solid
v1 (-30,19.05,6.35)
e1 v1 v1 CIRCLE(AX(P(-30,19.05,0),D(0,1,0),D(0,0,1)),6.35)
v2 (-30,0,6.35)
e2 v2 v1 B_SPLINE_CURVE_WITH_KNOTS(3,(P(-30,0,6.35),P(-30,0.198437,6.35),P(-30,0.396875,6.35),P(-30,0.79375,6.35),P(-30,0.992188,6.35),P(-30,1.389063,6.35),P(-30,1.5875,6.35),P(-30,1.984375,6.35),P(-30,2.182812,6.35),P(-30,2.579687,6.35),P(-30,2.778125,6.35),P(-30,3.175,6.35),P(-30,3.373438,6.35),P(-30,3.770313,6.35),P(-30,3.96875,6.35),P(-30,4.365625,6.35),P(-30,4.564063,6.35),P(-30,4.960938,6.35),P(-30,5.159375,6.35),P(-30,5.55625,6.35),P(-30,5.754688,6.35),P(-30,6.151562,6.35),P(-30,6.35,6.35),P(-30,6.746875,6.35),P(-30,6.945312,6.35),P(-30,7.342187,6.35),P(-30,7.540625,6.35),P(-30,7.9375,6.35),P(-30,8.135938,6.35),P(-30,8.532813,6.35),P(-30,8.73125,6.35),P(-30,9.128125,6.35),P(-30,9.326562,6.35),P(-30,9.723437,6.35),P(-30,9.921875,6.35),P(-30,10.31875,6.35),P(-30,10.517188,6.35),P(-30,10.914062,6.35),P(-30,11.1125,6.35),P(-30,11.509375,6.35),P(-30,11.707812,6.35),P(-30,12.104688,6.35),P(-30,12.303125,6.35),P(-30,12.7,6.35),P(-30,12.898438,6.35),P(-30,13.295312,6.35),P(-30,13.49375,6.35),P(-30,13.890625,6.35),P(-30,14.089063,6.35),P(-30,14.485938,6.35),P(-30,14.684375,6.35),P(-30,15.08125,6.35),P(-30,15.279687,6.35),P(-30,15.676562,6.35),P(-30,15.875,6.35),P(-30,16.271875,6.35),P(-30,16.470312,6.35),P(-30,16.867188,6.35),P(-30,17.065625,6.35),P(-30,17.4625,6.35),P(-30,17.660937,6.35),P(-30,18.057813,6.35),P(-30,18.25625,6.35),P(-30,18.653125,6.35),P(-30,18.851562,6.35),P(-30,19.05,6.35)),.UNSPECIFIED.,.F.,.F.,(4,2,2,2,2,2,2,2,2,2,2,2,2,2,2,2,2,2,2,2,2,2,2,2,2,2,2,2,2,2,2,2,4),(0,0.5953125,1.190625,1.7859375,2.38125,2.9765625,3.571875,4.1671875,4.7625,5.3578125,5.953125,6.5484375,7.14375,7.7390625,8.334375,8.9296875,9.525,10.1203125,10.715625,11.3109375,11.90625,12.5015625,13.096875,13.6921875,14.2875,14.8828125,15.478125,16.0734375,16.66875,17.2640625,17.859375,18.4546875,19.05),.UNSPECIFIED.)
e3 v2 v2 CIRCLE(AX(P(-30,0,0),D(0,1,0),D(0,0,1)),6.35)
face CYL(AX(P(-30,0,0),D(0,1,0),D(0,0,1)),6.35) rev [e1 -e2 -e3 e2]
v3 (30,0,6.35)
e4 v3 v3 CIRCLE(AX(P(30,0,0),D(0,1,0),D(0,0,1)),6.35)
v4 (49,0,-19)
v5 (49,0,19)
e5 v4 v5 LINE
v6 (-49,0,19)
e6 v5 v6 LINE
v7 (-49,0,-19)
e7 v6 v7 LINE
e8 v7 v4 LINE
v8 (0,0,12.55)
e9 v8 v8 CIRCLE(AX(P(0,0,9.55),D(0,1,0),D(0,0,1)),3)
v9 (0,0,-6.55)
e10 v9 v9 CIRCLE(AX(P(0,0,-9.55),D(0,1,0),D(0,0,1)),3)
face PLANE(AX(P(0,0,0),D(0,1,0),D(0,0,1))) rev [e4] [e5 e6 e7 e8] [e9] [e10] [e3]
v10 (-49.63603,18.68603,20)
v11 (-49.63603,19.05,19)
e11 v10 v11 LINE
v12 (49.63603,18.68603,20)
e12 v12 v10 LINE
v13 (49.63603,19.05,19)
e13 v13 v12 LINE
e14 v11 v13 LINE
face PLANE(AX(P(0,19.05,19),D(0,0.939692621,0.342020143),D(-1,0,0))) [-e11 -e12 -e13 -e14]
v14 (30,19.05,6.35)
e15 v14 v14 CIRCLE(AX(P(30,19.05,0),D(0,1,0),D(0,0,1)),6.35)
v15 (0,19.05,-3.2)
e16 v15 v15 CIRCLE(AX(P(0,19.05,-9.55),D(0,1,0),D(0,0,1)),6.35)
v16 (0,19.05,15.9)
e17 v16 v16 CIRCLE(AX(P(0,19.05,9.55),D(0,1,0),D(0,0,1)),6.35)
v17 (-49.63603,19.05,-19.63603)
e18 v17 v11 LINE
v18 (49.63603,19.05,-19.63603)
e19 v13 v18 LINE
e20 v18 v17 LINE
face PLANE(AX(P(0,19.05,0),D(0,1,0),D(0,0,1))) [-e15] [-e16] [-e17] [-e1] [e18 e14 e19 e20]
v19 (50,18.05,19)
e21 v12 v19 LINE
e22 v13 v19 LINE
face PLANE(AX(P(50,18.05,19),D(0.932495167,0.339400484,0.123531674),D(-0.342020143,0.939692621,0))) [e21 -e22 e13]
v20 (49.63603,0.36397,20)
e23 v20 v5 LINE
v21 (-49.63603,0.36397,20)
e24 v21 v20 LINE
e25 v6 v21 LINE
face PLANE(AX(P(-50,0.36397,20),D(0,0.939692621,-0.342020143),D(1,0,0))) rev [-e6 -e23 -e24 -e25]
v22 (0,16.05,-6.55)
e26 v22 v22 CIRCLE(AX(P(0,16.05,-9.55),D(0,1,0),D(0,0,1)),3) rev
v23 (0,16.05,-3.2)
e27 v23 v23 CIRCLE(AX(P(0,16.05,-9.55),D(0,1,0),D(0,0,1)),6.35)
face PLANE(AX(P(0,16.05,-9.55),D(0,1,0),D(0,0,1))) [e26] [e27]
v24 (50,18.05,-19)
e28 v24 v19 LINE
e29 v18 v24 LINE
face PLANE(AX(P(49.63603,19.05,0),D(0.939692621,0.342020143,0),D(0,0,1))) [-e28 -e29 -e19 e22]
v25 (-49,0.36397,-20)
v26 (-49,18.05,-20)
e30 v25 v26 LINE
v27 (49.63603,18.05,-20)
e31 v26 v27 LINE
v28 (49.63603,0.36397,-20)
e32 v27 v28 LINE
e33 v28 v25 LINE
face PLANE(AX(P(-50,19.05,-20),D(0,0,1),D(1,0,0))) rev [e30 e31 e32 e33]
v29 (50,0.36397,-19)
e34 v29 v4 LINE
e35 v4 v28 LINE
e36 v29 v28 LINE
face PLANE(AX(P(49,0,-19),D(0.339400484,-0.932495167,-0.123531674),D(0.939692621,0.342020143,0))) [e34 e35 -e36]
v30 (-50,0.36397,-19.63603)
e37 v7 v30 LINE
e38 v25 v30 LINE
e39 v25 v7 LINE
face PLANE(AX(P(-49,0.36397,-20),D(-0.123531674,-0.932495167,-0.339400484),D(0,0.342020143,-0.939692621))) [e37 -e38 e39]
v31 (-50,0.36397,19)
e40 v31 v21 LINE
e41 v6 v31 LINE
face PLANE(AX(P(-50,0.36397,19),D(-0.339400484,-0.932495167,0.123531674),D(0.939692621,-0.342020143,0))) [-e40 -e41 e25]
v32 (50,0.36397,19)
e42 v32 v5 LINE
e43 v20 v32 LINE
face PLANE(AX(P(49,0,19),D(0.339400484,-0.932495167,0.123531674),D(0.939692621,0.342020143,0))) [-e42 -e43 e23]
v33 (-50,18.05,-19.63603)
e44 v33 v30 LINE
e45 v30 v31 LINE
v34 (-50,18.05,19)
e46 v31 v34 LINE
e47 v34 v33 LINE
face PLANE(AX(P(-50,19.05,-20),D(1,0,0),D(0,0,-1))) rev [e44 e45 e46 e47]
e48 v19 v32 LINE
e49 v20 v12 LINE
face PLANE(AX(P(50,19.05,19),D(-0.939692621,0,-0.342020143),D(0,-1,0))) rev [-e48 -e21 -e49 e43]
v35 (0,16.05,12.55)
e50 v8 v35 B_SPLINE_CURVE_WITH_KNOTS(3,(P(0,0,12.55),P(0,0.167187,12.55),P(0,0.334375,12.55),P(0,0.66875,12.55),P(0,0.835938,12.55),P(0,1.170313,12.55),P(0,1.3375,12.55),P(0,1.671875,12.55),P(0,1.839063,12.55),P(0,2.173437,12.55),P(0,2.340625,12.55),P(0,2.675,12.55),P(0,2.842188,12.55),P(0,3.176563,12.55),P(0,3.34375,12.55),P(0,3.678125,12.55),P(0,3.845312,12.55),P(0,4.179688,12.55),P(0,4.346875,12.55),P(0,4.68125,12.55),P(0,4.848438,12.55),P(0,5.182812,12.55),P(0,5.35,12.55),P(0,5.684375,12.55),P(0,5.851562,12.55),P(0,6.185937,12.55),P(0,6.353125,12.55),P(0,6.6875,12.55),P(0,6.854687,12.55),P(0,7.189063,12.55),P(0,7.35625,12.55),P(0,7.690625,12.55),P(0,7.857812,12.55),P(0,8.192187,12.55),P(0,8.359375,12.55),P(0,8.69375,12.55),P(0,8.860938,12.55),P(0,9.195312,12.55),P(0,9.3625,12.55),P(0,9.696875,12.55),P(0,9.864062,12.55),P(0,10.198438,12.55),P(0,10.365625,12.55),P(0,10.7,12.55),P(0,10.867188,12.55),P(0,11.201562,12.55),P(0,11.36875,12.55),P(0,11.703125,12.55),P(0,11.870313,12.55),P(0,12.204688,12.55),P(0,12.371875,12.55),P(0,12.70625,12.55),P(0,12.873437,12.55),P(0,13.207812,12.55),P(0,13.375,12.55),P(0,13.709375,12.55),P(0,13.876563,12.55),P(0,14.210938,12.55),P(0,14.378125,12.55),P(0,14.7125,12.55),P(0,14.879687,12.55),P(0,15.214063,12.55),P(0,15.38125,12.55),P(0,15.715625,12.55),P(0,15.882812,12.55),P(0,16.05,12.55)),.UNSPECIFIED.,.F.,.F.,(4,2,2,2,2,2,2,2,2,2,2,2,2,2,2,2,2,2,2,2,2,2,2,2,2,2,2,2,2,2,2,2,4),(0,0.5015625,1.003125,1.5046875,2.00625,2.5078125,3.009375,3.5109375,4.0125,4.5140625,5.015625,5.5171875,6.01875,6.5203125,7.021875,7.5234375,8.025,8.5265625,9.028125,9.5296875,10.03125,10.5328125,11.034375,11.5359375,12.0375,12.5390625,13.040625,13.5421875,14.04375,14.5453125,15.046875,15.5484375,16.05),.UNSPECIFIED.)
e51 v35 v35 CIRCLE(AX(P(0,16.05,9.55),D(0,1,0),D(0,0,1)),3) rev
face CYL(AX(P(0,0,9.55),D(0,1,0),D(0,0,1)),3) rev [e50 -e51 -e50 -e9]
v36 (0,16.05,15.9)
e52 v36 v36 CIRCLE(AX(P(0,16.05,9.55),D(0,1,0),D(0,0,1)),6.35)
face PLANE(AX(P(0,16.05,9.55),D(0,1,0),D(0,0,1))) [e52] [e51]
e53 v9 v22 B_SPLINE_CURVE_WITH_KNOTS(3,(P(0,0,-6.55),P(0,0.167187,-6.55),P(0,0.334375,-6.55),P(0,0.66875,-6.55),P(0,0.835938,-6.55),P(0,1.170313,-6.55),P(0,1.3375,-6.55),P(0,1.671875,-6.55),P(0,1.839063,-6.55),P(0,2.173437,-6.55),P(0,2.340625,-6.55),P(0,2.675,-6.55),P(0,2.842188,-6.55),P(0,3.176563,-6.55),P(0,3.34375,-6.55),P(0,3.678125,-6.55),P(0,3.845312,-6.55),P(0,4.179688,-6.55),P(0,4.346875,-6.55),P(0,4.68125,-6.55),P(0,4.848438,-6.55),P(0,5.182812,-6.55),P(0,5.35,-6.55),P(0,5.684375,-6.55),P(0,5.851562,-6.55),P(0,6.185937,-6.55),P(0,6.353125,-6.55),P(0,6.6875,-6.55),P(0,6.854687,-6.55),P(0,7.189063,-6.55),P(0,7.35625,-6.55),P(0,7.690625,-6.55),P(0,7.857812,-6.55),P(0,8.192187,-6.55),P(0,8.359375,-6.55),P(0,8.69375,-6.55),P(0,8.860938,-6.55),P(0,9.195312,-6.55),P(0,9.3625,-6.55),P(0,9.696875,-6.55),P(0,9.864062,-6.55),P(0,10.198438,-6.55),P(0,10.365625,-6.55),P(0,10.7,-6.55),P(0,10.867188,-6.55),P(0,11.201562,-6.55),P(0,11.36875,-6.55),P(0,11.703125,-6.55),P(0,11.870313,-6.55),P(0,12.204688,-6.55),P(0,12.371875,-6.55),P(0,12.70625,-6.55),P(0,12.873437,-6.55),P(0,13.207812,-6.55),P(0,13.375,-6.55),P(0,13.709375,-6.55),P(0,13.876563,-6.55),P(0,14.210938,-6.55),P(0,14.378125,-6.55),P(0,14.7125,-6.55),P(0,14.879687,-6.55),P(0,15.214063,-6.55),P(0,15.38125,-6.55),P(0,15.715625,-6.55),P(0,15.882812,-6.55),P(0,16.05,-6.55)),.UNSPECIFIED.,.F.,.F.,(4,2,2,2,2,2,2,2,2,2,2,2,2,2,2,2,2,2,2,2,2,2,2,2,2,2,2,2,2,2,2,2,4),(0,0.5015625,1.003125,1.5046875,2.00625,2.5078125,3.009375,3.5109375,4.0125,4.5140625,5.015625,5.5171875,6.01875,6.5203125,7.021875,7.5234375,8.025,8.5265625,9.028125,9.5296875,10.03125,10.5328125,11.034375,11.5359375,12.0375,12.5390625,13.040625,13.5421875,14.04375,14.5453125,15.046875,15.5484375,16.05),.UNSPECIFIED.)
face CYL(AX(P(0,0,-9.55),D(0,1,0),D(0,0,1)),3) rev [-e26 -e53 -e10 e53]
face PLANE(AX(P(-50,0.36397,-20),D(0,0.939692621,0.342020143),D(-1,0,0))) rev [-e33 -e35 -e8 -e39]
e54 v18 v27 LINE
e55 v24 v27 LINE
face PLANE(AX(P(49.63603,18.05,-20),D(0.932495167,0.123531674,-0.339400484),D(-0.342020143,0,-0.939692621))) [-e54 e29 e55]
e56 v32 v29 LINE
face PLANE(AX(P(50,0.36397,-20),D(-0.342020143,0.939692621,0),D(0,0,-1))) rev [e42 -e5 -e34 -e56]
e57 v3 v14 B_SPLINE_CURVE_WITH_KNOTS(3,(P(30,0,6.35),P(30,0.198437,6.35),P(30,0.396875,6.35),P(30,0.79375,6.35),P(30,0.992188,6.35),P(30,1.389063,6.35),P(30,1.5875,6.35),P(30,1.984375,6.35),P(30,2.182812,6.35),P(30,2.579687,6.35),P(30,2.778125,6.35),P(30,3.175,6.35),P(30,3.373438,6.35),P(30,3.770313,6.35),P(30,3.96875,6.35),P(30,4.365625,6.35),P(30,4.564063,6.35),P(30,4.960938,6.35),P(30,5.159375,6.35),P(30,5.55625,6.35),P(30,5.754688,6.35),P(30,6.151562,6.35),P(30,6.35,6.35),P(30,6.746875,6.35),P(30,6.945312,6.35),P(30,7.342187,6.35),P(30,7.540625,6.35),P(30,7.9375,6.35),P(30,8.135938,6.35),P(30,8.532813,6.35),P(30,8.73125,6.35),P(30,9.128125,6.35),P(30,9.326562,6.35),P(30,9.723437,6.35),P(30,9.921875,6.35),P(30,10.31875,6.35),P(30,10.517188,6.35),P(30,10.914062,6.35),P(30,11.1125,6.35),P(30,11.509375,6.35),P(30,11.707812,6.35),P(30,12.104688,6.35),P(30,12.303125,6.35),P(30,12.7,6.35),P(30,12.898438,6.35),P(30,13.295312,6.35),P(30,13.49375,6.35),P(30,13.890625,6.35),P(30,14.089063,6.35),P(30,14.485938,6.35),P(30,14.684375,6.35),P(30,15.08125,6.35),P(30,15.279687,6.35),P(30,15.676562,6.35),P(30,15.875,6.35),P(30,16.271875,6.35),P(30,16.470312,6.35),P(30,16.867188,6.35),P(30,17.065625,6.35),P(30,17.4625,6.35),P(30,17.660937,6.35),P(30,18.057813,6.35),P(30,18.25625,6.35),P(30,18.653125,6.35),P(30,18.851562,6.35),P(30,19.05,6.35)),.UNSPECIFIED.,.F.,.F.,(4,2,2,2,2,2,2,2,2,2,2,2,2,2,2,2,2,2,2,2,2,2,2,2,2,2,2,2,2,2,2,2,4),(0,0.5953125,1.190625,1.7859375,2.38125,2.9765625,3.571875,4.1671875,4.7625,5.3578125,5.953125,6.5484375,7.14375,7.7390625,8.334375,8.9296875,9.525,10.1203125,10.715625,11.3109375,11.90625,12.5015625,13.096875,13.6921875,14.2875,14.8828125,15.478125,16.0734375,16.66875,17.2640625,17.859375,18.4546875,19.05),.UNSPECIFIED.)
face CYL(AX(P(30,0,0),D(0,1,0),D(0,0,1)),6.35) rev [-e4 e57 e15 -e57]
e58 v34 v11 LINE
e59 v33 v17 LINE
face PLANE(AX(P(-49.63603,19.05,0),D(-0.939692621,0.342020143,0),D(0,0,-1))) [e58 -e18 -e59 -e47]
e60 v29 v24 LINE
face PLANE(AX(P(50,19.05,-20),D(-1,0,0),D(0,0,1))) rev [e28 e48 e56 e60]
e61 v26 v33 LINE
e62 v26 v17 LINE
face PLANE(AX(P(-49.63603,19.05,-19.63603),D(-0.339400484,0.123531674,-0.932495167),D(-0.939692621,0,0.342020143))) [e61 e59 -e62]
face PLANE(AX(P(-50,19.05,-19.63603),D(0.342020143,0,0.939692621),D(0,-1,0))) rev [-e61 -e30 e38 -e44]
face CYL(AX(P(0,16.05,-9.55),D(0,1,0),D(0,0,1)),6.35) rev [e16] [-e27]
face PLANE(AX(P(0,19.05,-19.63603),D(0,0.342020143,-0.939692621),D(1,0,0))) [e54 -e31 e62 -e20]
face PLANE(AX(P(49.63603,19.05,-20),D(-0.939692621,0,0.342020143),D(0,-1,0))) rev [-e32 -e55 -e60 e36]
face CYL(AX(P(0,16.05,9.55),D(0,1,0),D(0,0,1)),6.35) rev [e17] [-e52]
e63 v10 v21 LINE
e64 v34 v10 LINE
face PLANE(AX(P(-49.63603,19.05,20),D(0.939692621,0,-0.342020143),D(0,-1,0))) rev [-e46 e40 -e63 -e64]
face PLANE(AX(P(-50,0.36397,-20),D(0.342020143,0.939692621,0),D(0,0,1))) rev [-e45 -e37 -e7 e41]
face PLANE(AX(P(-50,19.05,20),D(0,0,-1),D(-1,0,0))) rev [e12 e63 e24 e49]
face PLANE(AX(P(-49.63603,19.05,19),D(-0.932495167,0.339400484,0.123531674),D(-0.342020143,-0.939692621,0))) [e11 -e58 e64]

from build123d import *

# Parameters (mm, degrees)
SKETCH3_W           = 100
SKETCH3_H           = 40
BOSS_EXTRUDE1_DEPTH = 19.05
SKETCH4_R           = 3
SKETCH4_R_2         = 6.35
CUT_EXTRUDE1_DEPTH  = 58.121821575
SKETCH5_R           = 6.35
CUT_EXTRUDE2_DEPTH  = 3


with BuildPart() as part:
    # Sketch3 → Boss-Extrude1 (new body)
    with BuildSketch(Plane(origin=(0, 0, 0), x_dir=(1, 0, 0), z_dir=(0, 1, 0))):
        Rectangle(SKETCH3_W, SKETCH3_H)
    extrude(amount=BOSS_EXTRUDE1_DEPTH)

    # Sketch4 → Cut-Extrude1 (cut, through all)
    with BuildSketch(Plane(origin=(0, 19.05, 0), x_dir=(1, 0, 0), z_dir=(0, 1, 0))):
        with Locations(Location((0, 9.55, 0), (0, 0, 270))):
            Circle(SKETCH4_R)
        with Locations(Location((0, -9.55, 0), (0, 0, 270))):
            Circle(SKETCH4_R)
        with Locations(Location((-30, 0, 0), (0, 0, 270))):
            Circle(SKETCH4_R_2)
        with Locations(Location((30, 0, 0), (0, 0, 270))):
            Circle(SKETCH4_R_2)
    extrude(amount=-CUT_EXTRUDE1_DEPTH, mode=Mode.SUBTRACT)

    # Sketch5 → Cut-Extrude2 (cut)
    with BuildSketch(Plane(origin=(0, 19.05, 0), x_dir=(1, 0, 0), z_dir=(0, 1, 0))):
        with Locations(Location((0, 9.55, 0), (0, 0, 270))):
            Circle(SKETCH5_R)
        with Locations(Location((0, -9.55, 0), (0, 0, 270))):
            Circle(SKETCH5_R)
    extrude(amount=-CUT_EXTRUDE2_DEPTH, mode=Mode.SUBTRACT)

    # Chamfer1
    # the kernel refuses this chamfer: 1, 0.363970234 mm, written as the material it takes off along each edge
    with BuildSketch(Plane(origin=(-49.757353177, 18.595343255, 19.333333333), x_dir=(0.34202014332567077, 0.9396926207859077, 0), z_dir=(-0.932495167133386, 0.3394004844336423, 0.12353167382937617))) as chamfer1_piece_1:
        Polygon((-0.595445134, 0.335906163), (0.468732639, 0.335906163), (0.126712495, -0.671812326), align=None)
    extrude(amount=0.509225374, mode=Mode.SUBTRACT)
    with BuildSketch(Plane(origin=(-49.545343255, 18.383333333, -19.757353177), x_dir=(-0.9396926207859077, 0, 0.34202014332567077), z_dir=(-0.3394004844336423, 0.12353167382937617, -0.932495167133386)), Plane(origin=(49.757353177, 18.595343255, 19.333333333), x_dir=(-0.34202014332567077, 0.9396926207859077, 0), z_dir=(0.932495167133386, 0.3394004844336423, 0.12353167382937617)), Plane(origin=(49.545343255, 0.242646823, -19.333333333), x_dir=(0.34202014332567077, 0, 0.9396926207859077), z_dir=(0.3394004844336414, -0.9324951671333863, -0.12353167382937585))) as chamfer1_piece_2:
        Polygon((-0.595445134, -0.335906163), (0.468732639, -0.335906163), (0.126712495, 0.671812326), align=None)
    extrude(amount=0.509225374, mode=Mode.SUBTRACT)
    with BuildSketch(Plane(origin=(-49.545343255, 0.242646823, 19.333333333), x_dir=(0.9396926207859081, -0.3420201433256699, 0), z_dir=(-0.3394004844336414, -0.9324951671333863, 0.12353167382937585))) as chamfer1_piece_3:
        Polygon((-0.468732639, -0.335906163), (0.595445134, -0.335906163), (-0.126712495, 0.671812326), align=None)
    extrude(amount=0.509225374, mode=Mode.SUBTRACT)
    with BuildSketch(Plane(origin=(49.757353177, 18.383333333, -19.545343255), x_dir=(0.34202014332567077, 0, 0.9396926207859077), z_dir=(0.932495167133386, 0.12353167382937617, -0.3394004844336423)), Plane(origin=(49.545343255, 0.242646823, 19.333333333), x_dir=(-0.9396926207859081, -0.3420201433256699, 0), z_dir=(0.3394004844336414, -0.9324951671333863, 0.12353167382937585)), Plane(origin=(-49.333333333, 0.242646823, -19.545343255), x_dir=(-0.9396926207859077, 0, 0.34202014332567077), z_dir=(-0.12353167382937585, -0.9324951671333863, -0.3394004844336414))) as chamfer1_piece_4:
        Polygon((-0.468732639, 0.335906163), (0.595445134, 0.335906163), (-0.126712495, -0.671812326), align=None)
    extrude(amount=0.509225374, mode=Mode.SUBTRACT)
    with BuildSketch(Plane(origin=(-50, 19.05, 22.594194733), x_dir=(-0.013184058198643421, -0.9999130865277317, 0), z_dir=(0, 0, -1)), Plane(origin=(50, 19.05, -22.594194733), x_dir=(0.013184058198643421, -0.9999130865277317, 0), z_dir=(0, 0, 1))) as chamfer1_piece_5:
        with BuildLine():
            Line((1.037677893, 0), (-0.042563411, -0.377122659))
            Line((-0.042563411, -0.377122659), (-0.062561673, -0.376858977))
            ThreePointArc((-0.062561673, -0.376858977), (-0.022487748, -0.188545427), (-0.019998262, 0.000263681))
            Line((-0.019998262, 0.000263681), (0.000263681, 0.019998262))
            ThreePointArc((0.000263681, 0.019998262), (0.519012443, 0.013158453), (1.037941574, 0.019998262))
            Line((1.037941574, 0.019998262), (1.037677893, 0))
        make_face()
    extrude(amount=45.188389465, mode=Mode.SUBTRACT)
    with BuildSketch(Plane(origin=(-50, -2.594194733, 20), x_dir=(-0.013184058198643421, 0, -0.9999130865277317), z_dir=(0, 1, 0)), Plane(origin=(-50, -2.594194733, -20), x_dir=(0.9999130865277315, 0, -0.013184058198646842), z_dir=(0, 1, 0))) as chamfer1_piece_6:
        with BuildLine():
            Line((1.037677893, 0), (-0.042563411, -0.377122659))
            Line((-0.042563411, -0.377122659), (-0.062561673, -0.376858977))
            ThreePointArc((-0.062561673, -0.376858977), (-0.022487748, -0.188545427), (-0.019998262, 0.000263681))
            Line((-0.019998262, 0.000263681), (0.000263681, 0.019998262))
            ThreePointArc((0.000263681, 0.019998262), (0.519012443, 0.013158453), (1.037941574, 0.019998262))
            Line((1.037941574, 0.019998262), (1.037677893, 0))
        make_face()
    extrude(amount=24.238389465, mode=Mode.SUBTRACT)
    with BuildSketch(Plane(origin=(52.594194733, 19.05, 20), x_dir=(0, 0.013184058198646846, -0.9999130865277317), z_dir=(-1, 0, 0))) as chamfer1_piece_7:
        with BuildLine():
            Line((1.037677893, 0), (-0.042563411, 0.377122659))
            Line((-0.042563411, 0.377122659), (-0.062561673, 0.376858977))
            ThreePointArc((-0.062561673, 0.376858977), (-0.022487748, 0.188545427), (-0.019998262, -0.000263681))
            Line((-0.019998262, -0.000263681), (0.000263681, -0.019998262))
            ThreePointArc((0.000263681, -0.019998262), (0.519012443, -0.013158453), (1.037941574, -0.019998262))
            Line((1.037941574, -0.019998262), (1.037677893, 0))
        make_face()
    extrude(amount=105.188389465, mode=Mode.SUBTRACT)
    with BuildSketch(Plane(origin=(50, -2.594194733, 20), x_dir=(0.013184058198643421, 0, -0.9999130865277317), z_dir=(0, 1, 0))) as chamfer1_piece_8:
        with BuildLine():
            Line((1.037677893, 0), (-0.042563411, 0.377122659))
            Line((-0.042563411, 0.377122659), (-0.062561673, 0.376858977))
            ThreePointArc((-0.062561673, 0.376858977), (-0.022487748, 0.188545427), (-0.019998262, -0.000263681))
            Line((-0.019998262, -0.000263681), (0.000263681, -0.019998262))
            ThreePointArc((0.000263681, -0.019998262), (0.519012443, -0.013158453), (1.037941574, -0.019998262))
            Line((1.037941574, -0.019998262), (1.037677893, 0))
        make_face()
    extrude(amount=24.238389465, mode=Mode.SUBTRACT)
    with BuildSketch(Plane(origin=(50, -2.594194733, -20), x_dir=(-0.9950833631817483, 0, -0.09904090225205378), z_dir=(0, 1, 0))) as chamfer1_piece_9:
        with BuildLine():
            Line((0.379516987, 0), (-0.116377165, 1.031131304))
            Line((-0.116377165, 1.031131304), (-0.136278832, 1.029150486))
            ThreePointArc((-0.136278832, 1.029150486), (-0.071283478, 0.514262313), (-0.019901667, -0.001980818))
            Line((-0.019901667, -0.001980818), (0.001980818, -0.019901667))
            ThreePointArc((0.001980818, -0.019901667), (0.189877952, -0.001200217), (0.381497805, -0.019901667))
            Line((0.381497805, -0.019901667), (0.379516987, 0))
        make_face()
    extrude(amount=24.238389465, mode=Mode.SUBTRACT)
    with BuildSketch(Plane(origin=(52.594194733, 0, 20), x_dir=(0, -0.013184058198645909, -0.9999130865277317), z_dir=(-1, 0, 0)), Plane(origin=(-52.594194733, 19.05, -20), x_dir=(0, -0.9999130865277315, -0.013184058198646842), z_dir=(1, 0, 0))) as chamfer1_piece_10:
        with BuildLine():
            Line((1.037677893, 0), (-0.042563411, -0.377122659))
            Line((-0.042563411, -0.377122659), (-0.062561673, -0.376858977))
            ThreePointArc((-0.062561673, -0.376858977), (-0.022487748, -0.188545427), (-0.019998262, 0.000263681))
            Line((-0.019998262, 0.000263681), (0.000263681, 0.019998262))
            ThreePointArc((0.000263681, 0.019998262), (0.519012443, 0.013158453), (1.037941574, 0.019998262))
            Line((1.037941574, 0.019998262), (1.037677893, 0))
        make_face()
    extrude(amount=105.188389465, mode=Mode.SUBTRACT)
    with BuildSketch(Plane(origin=(-50, 0, 22.594194733), x_dir=(-0.0990409022520534, 0.9950833631817484, 0), z_dir=(0, 0, -1)), Plane(origin=(50, 0, -22.594194733), x_dir=(0.0990409022520534, 0.9950833631817484, 0), z_dir=(0, 0, 1))) as chamfer1_piece_11:
        with BuildLine():
            Line((0.379516987, 0), (-0.116377165, 1.031131304))
            Line((-0.116377165, 1.031131304), (-0.136278832, 1.029150486))
            ThreePointArc((-0.136278832, 1.029150486), (-0.071283478, 0.514262313), (-0.019901667, -0.001980818))
            Line((-0.019901667, -0.001980818), (0.001980818, -0.019901667))
            ThreePointArc((0.001980818, -0.019901667), (0.189877952, -0.001200217), (0.381497805, -0.019901667))
            Line((0.381497805, -0.019901667), (0.379516987, 0))
        make_face()
    extrude(amount=45.188389465, mode=Mode.SUBTRACT)
    with BuildSketch(Plane(origin=(-52.594194733, 0, -20), x_dir=(0, 0.9950833631817482, -0.09904090225205339), z_dir=(1, 0, 0))) as chamfer1_piece_12:
        with BuildLine():
            Line((0.379516987, 0), (-0.116377165, 1.031131304))
            Line((-0.116377165, 1.031131304), (-0.136278832, 1.029150486))
            ThreePointArc((-0.136278832, 1.029150486), (-0.071283478, 0.514262313), (-0.019901667, -0.001980818))
            Line((-0.019901667, -0.001980818), (0.001980818, -0.019901667))
            ThreePointArc((0.001980818, -0.019901667), (0.189877952, -0.001200217), (0.381497805, -0.019901667))
            Line((0.381497805, -0.019901667), (0.379516987, 0))
        make_face()
    extrude(amount=105.188389465, mode=Mode.SUBTRACT)


solid = part.part
